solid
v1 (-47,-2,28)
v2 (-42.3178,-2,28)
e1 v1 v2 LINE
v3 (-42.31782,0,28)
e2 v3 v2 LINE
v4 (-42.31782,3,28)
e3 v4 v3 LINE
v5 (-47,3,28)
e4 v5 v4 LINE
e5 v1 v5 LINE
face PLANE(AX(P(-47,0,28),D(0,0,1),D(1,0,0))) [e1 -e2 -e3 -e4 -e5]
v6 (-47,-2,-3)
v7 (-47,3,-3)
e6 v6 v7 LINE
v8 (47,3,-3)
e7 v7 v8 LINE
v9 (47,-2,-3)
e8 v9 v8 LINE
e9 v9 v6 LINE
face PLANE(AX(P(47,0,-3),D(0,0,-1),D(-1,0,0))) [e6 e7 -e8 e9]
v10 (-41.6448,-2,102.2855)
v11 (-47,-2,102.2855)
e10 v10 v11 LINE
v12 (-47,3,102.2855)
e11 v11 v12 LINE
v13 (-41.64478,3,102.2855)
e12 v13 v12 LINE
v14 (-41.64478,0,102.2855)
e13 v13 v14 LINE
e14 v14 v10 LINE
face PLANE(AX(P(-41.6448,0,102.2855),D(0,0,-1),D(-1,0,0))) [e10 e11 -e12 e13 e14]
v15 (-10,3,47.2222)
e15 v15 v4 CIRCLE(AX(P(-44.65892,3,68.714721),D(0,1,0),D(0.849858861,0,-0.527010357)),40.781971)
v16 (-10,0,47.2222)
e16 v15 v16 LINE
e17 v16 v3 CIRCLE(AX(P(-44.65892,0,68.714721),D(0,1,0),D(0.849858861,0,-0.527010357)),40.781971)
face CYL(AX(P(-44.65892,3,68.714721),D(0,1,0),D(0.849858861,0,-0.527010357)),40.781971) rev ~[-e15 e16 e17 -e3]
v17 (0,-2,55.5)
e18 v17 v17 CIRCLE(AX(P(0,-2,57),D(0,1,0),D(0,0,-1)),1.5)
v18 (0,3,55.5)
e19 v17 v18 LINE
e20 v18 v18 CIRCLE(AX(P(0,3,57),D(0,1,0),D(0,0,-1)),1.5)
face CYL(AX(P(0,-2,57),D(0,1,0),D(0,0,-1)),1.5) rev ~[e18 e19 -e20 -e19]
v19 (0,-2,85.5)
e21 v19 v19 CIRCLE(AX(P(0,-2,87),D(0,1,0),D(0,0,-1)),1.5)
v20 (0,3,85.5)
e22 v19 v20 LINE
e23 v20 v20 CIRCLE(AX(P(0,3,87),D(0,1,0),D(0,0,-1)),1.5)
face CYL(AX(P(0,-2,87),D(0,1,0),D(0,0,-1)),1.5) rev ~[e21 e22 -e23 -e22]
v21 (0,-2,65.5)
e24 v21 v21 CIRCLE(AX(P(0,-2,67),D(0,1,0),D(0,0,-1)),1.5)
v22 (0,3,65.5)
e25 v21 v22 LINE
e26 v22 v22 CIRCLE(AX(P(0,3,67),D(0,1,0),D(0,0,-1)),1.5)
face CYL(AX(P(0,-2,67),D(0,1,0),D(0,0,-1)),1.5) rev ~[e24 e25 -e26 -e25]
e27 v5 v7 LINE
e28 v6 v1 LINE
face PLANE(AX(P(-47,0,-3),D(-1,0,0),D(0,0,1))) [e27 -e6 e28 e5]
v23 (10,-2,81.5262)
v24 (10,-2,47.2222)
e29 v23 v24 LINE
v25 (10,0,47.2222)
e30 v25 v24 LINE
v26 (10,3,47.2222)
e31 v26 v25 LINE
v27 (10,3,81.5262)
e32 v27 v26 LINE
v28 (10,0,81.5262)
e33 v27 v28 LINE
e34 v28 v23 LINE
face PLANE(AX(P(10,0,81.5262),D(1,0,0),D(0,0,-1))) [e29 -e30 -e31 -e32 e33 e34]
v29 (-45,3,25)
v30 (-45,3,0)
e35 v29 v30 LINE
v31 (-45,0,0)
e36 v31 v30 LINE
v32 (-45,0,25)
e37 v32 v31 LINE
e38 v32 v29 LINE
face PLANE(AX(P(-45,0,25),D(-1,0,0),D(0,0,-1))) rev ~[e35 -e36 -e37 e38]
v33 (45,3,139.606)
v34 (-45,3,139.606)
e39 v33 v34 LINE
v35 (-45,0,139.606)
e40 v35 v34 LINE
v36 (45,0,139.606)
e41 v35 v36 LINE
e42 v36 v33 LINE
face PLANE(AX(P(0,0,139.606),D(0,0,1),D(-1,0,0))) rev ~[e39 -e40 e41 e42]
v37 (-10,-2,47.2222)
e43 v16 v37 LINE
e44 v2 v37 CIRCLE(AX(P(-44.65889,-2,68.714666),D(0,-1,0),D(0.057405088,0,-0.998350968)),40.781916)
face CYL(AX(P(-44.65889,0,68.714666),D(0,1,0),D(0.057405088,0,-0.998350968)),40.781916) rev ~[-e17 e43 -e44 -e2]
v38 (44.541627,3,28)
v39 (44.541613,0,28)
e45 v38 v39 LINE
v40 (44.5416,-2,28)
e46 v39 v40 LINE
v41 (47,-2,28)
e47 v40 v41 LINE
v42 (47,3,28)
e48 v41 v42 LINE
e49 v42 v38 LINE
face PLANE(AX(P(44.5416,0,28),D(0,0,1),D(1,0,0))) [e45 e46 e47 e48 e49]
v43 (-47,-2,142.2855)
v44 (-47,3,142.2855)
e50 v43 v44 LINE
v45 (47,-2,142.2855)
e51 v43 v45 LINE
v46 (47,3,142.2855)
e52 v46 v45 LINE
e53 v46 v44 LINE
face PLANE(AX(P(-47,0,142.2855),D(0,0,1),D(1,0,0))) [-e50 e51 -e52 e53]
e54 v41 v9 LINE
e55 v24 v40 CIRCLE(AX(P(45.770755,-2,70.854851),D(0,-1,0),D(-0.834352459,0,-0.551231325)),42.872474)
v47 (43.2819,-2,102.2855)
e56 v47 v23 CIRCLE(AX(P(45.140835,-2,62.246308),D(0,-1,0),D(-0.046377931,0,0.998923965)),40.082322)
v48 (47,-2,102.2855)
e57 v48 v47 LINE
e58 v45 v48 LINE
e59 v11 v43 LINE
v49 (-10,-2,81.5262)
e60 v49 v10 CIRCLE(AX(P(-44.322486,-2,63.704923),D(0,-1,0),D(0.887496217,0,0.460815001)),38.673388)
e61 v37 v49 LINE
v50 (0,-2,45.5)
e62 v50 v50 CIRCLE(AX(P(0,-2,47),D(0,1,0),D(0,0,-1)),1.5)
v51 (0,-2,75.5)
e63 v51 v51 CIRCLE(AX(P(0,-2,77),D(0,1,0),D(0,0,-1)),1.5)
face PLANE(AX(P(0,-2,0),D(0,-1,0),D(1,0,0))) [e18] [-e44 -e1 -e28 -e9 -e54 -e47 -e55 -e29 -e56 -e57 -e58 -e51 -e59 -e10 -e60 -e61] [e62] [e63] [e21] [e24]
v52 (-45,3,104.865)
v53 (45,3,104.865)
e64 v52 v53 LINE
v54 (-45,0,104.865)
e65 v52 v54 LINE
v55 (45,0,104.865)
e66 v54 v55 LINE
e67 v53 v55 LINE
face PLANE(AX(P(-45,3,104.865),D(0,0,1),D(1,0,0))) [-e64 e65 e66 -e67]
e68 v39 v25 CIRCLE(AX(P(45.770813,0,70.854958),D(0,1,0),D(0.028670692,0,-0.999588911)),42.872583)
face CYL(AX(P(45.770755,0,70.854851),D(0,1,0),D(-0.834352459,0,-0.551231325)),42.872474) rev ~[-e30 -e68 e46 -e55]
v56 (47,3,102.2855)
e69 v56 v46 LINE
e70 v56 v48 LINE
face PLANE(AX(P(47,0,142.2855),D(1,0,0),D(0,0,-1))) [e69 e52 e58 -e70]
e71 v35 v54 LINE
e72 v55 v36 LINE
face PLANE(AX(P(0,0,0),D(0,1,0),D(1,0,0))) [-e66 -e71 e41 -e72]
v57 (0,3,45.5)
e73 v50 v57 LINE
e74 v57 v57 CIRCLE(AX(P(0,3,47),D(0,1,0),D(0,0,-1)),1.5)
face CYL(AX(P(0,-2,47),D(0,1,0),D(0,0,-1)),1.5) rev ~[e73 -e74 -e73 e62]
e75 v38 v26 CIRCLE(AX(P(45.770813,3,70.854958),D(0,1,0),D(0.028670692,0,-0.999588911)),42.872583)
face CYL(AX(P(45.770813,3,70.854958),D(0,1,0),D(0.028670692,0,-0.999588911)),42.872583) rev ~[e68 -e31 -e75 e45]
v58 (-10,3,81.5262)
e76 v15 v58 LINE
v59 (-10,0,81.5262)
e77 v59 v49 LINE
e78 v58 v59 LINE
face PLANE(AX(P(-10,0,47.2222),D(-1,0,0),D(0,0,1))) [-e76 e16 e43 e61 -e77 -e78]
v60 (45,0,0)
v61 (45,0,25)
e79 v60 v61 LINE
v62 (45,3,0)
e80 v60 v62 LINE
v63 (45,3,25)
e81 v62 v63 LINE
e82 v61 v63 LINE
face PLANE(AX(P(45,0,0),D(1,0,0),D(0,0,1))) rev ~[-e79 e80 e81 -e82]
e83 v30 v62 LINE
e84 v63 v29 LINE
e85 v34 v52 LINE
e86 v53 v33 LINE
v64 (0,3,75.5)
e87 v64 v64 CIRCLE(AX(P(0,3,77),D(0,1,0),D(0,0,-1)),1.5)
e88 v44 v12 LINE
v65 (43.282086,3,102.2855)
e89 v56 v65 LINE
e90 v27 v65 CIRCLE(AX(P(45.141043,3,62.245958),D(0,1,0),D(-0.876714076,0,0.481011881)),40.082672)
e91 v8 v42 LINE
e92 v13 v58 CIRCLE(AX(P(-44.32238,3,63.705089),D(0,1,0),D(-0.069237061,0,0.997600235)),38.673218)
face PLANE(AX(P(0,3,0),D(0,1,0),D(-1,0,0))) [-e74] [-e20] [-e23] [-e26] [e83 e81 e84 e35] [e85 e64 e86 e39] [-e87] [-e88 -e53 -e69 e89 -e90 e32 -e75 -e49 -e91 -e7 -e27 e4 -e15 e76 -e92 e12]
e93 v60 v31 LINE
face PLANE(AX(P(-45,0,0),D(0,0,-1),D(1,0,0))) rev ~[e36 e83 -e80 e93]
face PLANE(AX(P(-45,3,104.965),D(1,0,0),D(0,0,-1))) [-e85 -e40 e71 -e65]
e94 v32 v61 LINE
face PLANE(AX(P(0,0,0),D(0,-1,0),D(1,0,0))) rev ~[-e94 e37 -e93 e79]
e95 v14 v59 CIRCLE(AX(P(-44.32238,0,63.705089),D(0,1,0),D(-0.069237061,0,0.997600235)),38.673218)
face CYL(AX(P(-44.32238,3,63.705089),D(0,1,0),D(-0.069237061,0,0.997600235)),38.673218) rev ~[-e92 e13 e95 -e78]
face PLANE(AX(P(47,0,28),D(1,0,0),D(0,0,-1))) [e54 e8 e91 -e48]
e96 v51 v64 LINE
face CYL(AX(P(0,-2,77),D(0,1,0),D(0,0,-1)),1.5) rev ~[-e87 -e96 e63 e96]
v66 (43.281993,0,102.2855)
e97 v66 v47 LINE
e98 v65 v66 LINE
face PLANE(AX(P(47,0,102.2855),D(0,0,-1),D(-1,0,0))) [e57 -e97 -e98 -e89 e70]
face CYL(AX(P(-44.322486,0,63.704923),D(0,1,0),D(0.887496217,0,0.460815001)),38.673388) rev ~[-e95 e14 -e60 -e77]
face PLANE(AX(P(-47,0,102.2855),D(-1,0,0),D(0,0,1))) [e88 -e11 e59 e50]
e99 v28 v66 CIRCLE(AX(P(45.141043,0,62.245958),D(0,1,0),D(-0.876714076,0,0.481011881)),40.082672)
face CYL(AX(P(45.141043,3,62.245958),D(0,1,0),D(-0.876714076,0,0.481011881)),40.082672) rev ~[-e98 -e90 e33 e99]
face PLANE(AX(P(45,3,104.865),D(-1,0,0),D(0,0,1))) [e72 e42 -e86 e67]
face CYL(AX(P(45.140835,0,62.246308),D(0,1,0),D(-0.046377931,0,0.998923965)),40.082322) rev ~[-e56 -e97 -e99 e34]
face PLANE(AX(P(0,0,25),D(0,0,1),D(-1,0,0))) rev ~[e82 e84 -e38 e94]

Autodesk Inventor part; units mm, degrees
ref_plane "YZ Plane" through (0, 0, 0) normal (1, 0, 0) x (0, 1, 0)
ref_plane "XZ Plane" through (0, 0, 0) normal (0, 1, 0) x (-1, 0, 0)
ref_plane "XY Plane" through (0, 0, 0) normal (0, 0, 1) x (1, 0, 0)
sketch "スケッチ1" plane through (0, 0, 0) normal (0, 1, 0) x (-1, 0, 0)
  line L0 (0, 0) -> (0, 25)
  line L1 (0, 25) -> (0, 104.965)
  line L2 (0, 104.965) -> (0, 139.606)
  line L3 (-45, 25) -> (45, 25)
  line L4 (45, 25) -> (45, 0)
  line L5 (45, 0) -> (-45, 0)
  line L6 (-45, 0) -> (-45, 25)
  line L7 (-45, 25) -> (45, 0) construction
  line L8 (45, 25) -> (-45, 0) construction
  line L9 (-47, 28) -> (47, 28)
  line L10 (47, 28) -> (47, -3)
  line L11 (47, -3) -> (-47, -3)
  line L12 (-47, -3) -> (-47, 28)
  line L13 (-47, 28) -> (47, -3) construction
  line L14 (47, 28) -> (-47, -3) construction
  line L15 (-47, 142.2855) -> (47, 142.2855)
  line L16 (47, 142.2855) -> (47, 102.2855)
  line L17 (47, 102.2855) -> (-47, 102.2855)
  line L18 (-47, 102.2855) -> (-47, 142.2855)
  line L19 (-47, 142.2855) -> (47, 102.2855) construction
  line L20 (47, 142.2855) -> (-47, 102.2855) construction
  line L21 (-45, 139.606) -> (45, 139.606)
  line L22 (45, 139.606) -> (45, 104.965)
  line L23 (45, 104.965) -> (-45, 104.965)
  line L24 (-45, 104.965) -> (-45, 139.606)
  line L25 (-45, 139.606) -> (45, 104.965) construction
  line L26 (45, 139.606) -> (-45, 104.965) construction
  line L27 (-10, 28) -> (10, 28)
  line L28 (10, 28) -> (10, 102.2855)
  line L29 (10, 102.2855) -> (-10, 102.2855)
  line L30 (-10, 102.2855) -> (-10, 28)
  arc A0 (-10, 84.5837) -> (-47, 102.2855) centre (-46.0082, 56.8392) ccw
  arc A1 (-47, 28) -> (-10, 49.4601) centre (-44.5907, 66.4724) ccw
  arc A2 (47, 102.2855) -> (10, 84.5837) centre (46.0082, 56.8392) ccw
  arc A3 (10, 49.4601) -> (47, 28) centre (44.5907, 66.4724) ccw
  point P0 (0, 12.5)
  point P1 (0, 12.5)
  point P2 (0, 122.2855)
  point P3 (0, 122.2855)
  dimension "d0" = 25
  dimension "d1" = 79.965
  dimension "d2" = 34.641
  dimension "d3" = 90
  dimension "d4" = 94
  dimension "d5" = 31
  dimension "d6" = 94
  dimension "d7" = 40
  dimension "d8" = 90
  dimension "d9" = 20
  dimension "d10" = 10
extrude "押し出し1" add sketch "スケッチ1" along normal blind 3 contours L9 L30 L17 L1 | L9 A3 L10 L11 L12 A1 | L1 L17 L28 L9 | L17 A0 L18 L15 L16 A2 | A1 L9 | L9 A3 | A2 L17 | L17 A0
sketch "スケッチ2" plane through (0, 3, 0) normal (0, 1, 0) x (1, 0, 0)
  line L0 (-45, -139.606) -> (-45, -104.965) projected
  line L1 (-45, -104.965) -> (45, -104.965) projected
  line L2 (45, -104.965) -> (45, -139.606) projected
  line L3 (45, -139.606) -> (-45, -139.606) projected
  line L4 (-45, -25) -> (-45, 0) projected
  line L5 (-45, 0) -> (45, 0) projected
  line L6 (45, 0) -> (45, -25) projected
  line L7 (45, -25) -> (-45, -25) projected
  line L8 (-10, -28) -> (-10, -102.2855) projected
  line L9 (-10, -102.2855) -> (-47, -102.2855) projected
  line L10 (-47, -102.2855) -> (-47, -142.2855) projected
  line L11 (-47, -142.2855) -> (47, -142.2855) projected
  line L12 (47, -142.2855) -> (47, -102.2855) projected
  line L13 (47, -102.2855) -> (10, -102.2855) projected
  line L14 (10, -102.2855) -> (10, -28) projected
  line L15 (10, -28) -> (47, -28) projected
  line L16 (47, -28) -> (47, 3) projected
  line L17 (47, 3) -> (-47, 3) projected
  line L18 (-47, 3) -> (-47, -28) projected
  line L19 (-47, -28) -> (-10, -28) projected
  arc A0 (-10, -47.2222) -> (-47, -28) centre (-44.6937, -68.7817) ccw
  arc A1 (-47, -102.2855) -> (-10, -81.2921) centre (-44.5262, -63.5433) ccw
  line L20 (0, -57.408) -> (0, -62.3253)
  arc A2 (47, -28) -> (10, -47.2222) centre (44.6937, -68.7817) ccw
  arc A3 (10, -81.2921) -> (47, -102.2855) centre (44.5262, -63.5433) ccw
  arc A4 (-10, -47.2222) -> (-47, -28) centre (-44.6937, -68.7817) ccw
  arc A5 (-47, -102.2855) -> (-10, -81.2921) centre (-44.5262, -63.5433) ccw
  arc A6 (47, -28) -> (10, -47.2222) centre (44.6937, -68.7817) ccw
  arc A7 (10, -81.2921) -> (47, -102.2855) centre (44.5262, -63.5433) ccw
  point P0 (0, 0)
sketch "スケッチ3" plane through (0, 3, 0) normal (0, 1, 0) x (1, 0, 0)
  line L0 (-45, -139.606) -> (-45, -104.965) projected
  line L1 (-45, -104.965) -> (45, -104.965) projected
  line L2 (45, -104.965) -> (45, -139.606) projected
  line L3 (45, -139.606) -> (-45, -139.606) projected
  line L4 (-45, -25) -> (-45, 0) projected
  line L5 (-45, 0) -> (45, 0) projected
  line L6 (45, 0) -> (45, -25) projected
  line L7 (45, -25) -> (-45, -25) projected
  line L8 (-10, -28) -> (-10, -102.2855) projected
  line L9 (-10, -102.2855) -> (-47, -102.2855) projected
  line L10 (-47, -102.2855) -> (-47, -142.2855) projected
  line L11 (-47, -142.2855) -> (47, -142.2855) projected
  line L12 (47, -142.2855) -> (47, -102.2855) projected
  line L13 (47, -102.2855) -> (10, -102.2855) projected
  line L14 (10, -102.2855) -> (10, -28) projected
  line L15 (10, -28) -> (47, -28) projected
  line L16 (47, -28) -> (47, 3) projected
  line L17 (47, 3) -> (-47, 3) projected
  line L18 (-47, 3) -> (-47, -28) projected
  line L19 (-47, -28) -> (-10, -28) projected
  arc A0 (-10, -47.2222) -> (-47, -28) centre (-44.6589, -68.7147) ccw
  arc A1 (47, -28) -> (10, -47.2222) centre (45.0843, -69.5335) ccw
  arc A2 (10, -81.5262) -> (47, -102.2855) centre (44.8559, -62.7542) ccw
  arc A3 (-47, -102.2855) -> (-10, -81.5262) centre (-44.3224, -63.705) ccw
  point P0 (0, 0)
extrude "押し出し3" add sketch "スケッチ3" against normal blind 3 contours L19 A0 L18 L17 L16 A1 L15 L14 L13 A2 L12 L11 L10 A3 L9 L8 | L8 A0 L19 | L19 A0 | L8 L9 A3 | A3 L9 | L15 A1 | A2 L13
sketch "スケッチ4" plane through (0, 3, 0) normal (0, 1, 0) x (1, 0, 0)
  line L0 (-45, -139.606) -> (-45, -104.965) projected
  line L1 (-45, -104.965) -> (45, -104.965) projected
  line L2 (45, -104.965) -> (45, -139.606) projected
  line L3 (45, -139.606) -> (-45, -139.606) projected
  line L4 (-45, -25) -> (-45, 0) projected
  line L5 (-45, 0) -> (45, 0) projected
  line L6 (45, 0) -> (45, -25) projected
  line L7 (45, -25) -> (-45, -25) projected
  line L8 (-10, -47.2222) -> (-10, -81.5262) projected
  arc A0 (-41.6448, -102.2855) -> (-10, -81.5262) centre (-44.3224, -63.705) ccw projected
  line L9 (-41.6448, -102.2855) -> (-47, -102.2855) projected
  line L10 (-47, -102.2855) -> (-47, -142.2855) projected
  line L11 (-47, -142.2855) -> (47, -142.2855) projected
  line L12 (47, -142.2855) -> (47, -102.2855) projected
  line L13 (47, -102.2855) -> (10, -102.2855) projected
  line L14 (10, -102.2855) -> (10, -28) projected
  line L15 (10, -28) -> (47, -28) projected
  line L16 (47, -28) -> (47, 3) projected
  line L17 (47, 3) -> (-47, 3) projected
  line L18 (-47, 3) -> (-47, -28) projected
  line L19 (-47, -28) -> (-42.3178, -28) projected
  arc A1 (-10, -47.2222) -> (-42.3178, -28) centre (-44.6589, -68.7147) ccw projected
  arc A2 (47, -28) -> (10, -47.2222) centre (45.7708, -70.8549) ccw
  arc A3 (10, -81.5262) -> (47, -102.2855) centre (45.1409, -62.2461) ccw
  point P0 (0, 0)
extrude "押し出し4" add sketch "スケッチ4" against normal blind 3
sketch "スケッチ5" plane through (0, 0, 0) normal (0, -1, 0) x (1, 0, 0)
  arc A0 (43.2819, 102.2855) -> (10, 81.5262) centre (45.1409, 62.2461) ccw projected
  line L0 (47, 102.2855) -> (43.2819, 102.2855) projected
  line L1 (47, 142.2855) -> (47, 102.2855) projected
  line L2 (-47, 142.2855) -> (47, 142.2855) projected
  line L3 (-47, 102.2855) -> (-47, 142.2855) projected
  line L4 (-41.6448, 102.2855) -> (-47, 102.2855) projected
  arc A1 (-10, 81.5262) -> (-41.6448, 102.2855) centre (-44.3224, 63.705) ccw projected
  line L5 (-10, 47.2222) -> (-10, 81.5262) projected
  arc A2 (-42.3178, 28) -> (-10, 47.2222) centre (-44.6589, 68.7147) ccw projected
  line L6 (-47, 28) -> (-42.3178, 28) projected
  line L7 (-47, -3) -> (-47, 28) projected
  line L8 (47, -3) -> (-47, -3) projected
  line L9 (47, 28) -> (47, -3) projected
  line L10 (44.5416, 28) -> (47, 28) projected
  arc A3 (10, 47.2222) -> (44.5416, 28) centre (45.7708, 70.8549) ccw projected
  line L11 (10, 81.5262) -> (10, 47.2222) projected
  point P0 (0, 0)
extrude "押し出し5" add sketch "スケッチ5" along normal blind 2
sketch "スケッチ6" plane through (0, 3, 0) normal (0, 1, 0) x (1, 0, 0)
  line L0 (45, -104.965) -> (-45, -104.965)
  line L1 (-45, -104.965) -> (-45, -104.865)
  line L2 (-45, -104.865) -> (45, -104.865)
  line L3 (45, -104.865) -> (45, -104.965)
  point P0 (0, 0)
  dimension "d21" = 0.1
extrude "押し出し6" cut sketch "スケッチ6" against normal blind 3
sketch "スケッチ7" plane through (-10, 3, 47.2222) normal (-1, 0, 0) x (0, 0, 1)
  line L0 (34.3041, -5) -> (0, -5) projected
  line L1 (57.6402, 0) -> (44.0812, 0)
  line L2 (44.0812, 0) -> (54.2504, 5.8712)
  line L3 (57.6402, 0) -> (54.2504, 5.8712)
  point P0 (-47.2222, -3)
  dimension "d24" = 30
extrude "押し出し7" add sketch "スケッチ7" against normal blind 20
sketch "スケッチ8" plane through (-10, 3, 47.2222) normal (-1, 0, 0) x (0, 0, 1)
  line L0 (57.6402, 0) -> (44.0812, 0) projected
  line L1 (54.2504, 5.8712) -> (57.6402, 0) projected
  line L2 (44.0812, 0) -> (54.2504, 5.8712) projected
  line L3 (57.6402, 0) -> (48.1987, 16.3532)
  line L4 (44.0812, 13.9759) -> (44.0812, 0)
  line L5 (44.0812, 13.9759) -> (48.1987, 16.3532)
  point P0 (-47.2222, -3)
  dimension "d27" = 18.883
extrude "押し出し8" add sketch "スケッチ8" against normal blind 20 contours L4 L5 L3 L2
sketch "スケッチ9" plane through (-10, 3, 47.2222) normal (-1, 0, 0) x (0, 0, 1)
  line L0 (48.1987, 16.3532) -> (44.0812, 13.9759) projected
  line L1 (44.0812, 13.9759) -> (44.0812, 0) projected
  line L2 (48.1987, 16.3532) -> (47.6747, 17.2608)
  line L3 (47.6747, 17.2608) -> (43.5572, 14.8835)
  line L4 (43.5572, 14.8835) -> (44.0812, 13.9759)
  line L5 (44.0812, 13.9759) -> (48.1987, 16.3532)
  line L6 (44.0812, 13.9759) -> (44.0812, 15.1861)
  point P0 (-47.2222, -3)
  dimension "d30" = 1.048
extrude "押し出し9" add sketch "スケッチ9" against normal blind 20 contours L0 L6 L3 L2
sketch "スケッチ10" plane through (-10, 3, 47.2222) normal (-1, 0, 0) x (0, 0, 1)
  line L0 (57.6402, 0) -> (44.0812, 0) projected
  line L1 (57.6402, 0) -> (47.6747, 17.2608) projected
  line L2 (47.6747, 17.2608) -> (44.0812, 15.1861) projected
  line L3 (44.0812, 15.1861) -> (44.0812, 0) projected
  point P0 (-47.2222, -3)
extrude "押し出し10" cut sketch "スケッチ10" against normal blind 20
sketch "スケッチ11" plane through (0, -2, 0) normal (0, -1, 0) x (1, 0, 0)
  line L0 (-47, -3) -> (47, -3) projected
  line L1 (10, 47.2222) -> (10, 81.5262) projected
  line L2 (0, -3) -> (0, 47)
  line L3 (0, 47) -> (0, 57)
  line L4 (0, 57) -> (0, 67)
  line L5 (0, 67) -> (0, 77)
  line L6 (0, 77) -> (0, 87)
  circle A0 centre (0, 47) radius 1.5
  circle A1 centre (0, 57) radius 1.5
  circle A2 centre (0, 67) radius 1.5
  circle A3 centre (0, 77) radius 1.5
  circle A4 centre (0, 87) radius 1.5
  point P0 (0, 0)
  dimension "d35" = 50
  dimension "d36" = 10
  dimension "d37" = 10
  dimension "d38" = 10
  dimension "d39" = 10
  dimension "d40" = 3
  dimension "d41" = 3
  dimension "d42" = 3
  dimension "d43" = 3
  dimension "d44" = 3
hole "穴1" at (0, -2, 87) at (0, -2, 77) at (0, -2, 67) at (0, -2, 57) at (0, -2, 47) direction (0, 1, 0) diameter 3 depth 8 tip angle 118
properties part number "知能ロボコン台座" material "ABS プラスチック"
